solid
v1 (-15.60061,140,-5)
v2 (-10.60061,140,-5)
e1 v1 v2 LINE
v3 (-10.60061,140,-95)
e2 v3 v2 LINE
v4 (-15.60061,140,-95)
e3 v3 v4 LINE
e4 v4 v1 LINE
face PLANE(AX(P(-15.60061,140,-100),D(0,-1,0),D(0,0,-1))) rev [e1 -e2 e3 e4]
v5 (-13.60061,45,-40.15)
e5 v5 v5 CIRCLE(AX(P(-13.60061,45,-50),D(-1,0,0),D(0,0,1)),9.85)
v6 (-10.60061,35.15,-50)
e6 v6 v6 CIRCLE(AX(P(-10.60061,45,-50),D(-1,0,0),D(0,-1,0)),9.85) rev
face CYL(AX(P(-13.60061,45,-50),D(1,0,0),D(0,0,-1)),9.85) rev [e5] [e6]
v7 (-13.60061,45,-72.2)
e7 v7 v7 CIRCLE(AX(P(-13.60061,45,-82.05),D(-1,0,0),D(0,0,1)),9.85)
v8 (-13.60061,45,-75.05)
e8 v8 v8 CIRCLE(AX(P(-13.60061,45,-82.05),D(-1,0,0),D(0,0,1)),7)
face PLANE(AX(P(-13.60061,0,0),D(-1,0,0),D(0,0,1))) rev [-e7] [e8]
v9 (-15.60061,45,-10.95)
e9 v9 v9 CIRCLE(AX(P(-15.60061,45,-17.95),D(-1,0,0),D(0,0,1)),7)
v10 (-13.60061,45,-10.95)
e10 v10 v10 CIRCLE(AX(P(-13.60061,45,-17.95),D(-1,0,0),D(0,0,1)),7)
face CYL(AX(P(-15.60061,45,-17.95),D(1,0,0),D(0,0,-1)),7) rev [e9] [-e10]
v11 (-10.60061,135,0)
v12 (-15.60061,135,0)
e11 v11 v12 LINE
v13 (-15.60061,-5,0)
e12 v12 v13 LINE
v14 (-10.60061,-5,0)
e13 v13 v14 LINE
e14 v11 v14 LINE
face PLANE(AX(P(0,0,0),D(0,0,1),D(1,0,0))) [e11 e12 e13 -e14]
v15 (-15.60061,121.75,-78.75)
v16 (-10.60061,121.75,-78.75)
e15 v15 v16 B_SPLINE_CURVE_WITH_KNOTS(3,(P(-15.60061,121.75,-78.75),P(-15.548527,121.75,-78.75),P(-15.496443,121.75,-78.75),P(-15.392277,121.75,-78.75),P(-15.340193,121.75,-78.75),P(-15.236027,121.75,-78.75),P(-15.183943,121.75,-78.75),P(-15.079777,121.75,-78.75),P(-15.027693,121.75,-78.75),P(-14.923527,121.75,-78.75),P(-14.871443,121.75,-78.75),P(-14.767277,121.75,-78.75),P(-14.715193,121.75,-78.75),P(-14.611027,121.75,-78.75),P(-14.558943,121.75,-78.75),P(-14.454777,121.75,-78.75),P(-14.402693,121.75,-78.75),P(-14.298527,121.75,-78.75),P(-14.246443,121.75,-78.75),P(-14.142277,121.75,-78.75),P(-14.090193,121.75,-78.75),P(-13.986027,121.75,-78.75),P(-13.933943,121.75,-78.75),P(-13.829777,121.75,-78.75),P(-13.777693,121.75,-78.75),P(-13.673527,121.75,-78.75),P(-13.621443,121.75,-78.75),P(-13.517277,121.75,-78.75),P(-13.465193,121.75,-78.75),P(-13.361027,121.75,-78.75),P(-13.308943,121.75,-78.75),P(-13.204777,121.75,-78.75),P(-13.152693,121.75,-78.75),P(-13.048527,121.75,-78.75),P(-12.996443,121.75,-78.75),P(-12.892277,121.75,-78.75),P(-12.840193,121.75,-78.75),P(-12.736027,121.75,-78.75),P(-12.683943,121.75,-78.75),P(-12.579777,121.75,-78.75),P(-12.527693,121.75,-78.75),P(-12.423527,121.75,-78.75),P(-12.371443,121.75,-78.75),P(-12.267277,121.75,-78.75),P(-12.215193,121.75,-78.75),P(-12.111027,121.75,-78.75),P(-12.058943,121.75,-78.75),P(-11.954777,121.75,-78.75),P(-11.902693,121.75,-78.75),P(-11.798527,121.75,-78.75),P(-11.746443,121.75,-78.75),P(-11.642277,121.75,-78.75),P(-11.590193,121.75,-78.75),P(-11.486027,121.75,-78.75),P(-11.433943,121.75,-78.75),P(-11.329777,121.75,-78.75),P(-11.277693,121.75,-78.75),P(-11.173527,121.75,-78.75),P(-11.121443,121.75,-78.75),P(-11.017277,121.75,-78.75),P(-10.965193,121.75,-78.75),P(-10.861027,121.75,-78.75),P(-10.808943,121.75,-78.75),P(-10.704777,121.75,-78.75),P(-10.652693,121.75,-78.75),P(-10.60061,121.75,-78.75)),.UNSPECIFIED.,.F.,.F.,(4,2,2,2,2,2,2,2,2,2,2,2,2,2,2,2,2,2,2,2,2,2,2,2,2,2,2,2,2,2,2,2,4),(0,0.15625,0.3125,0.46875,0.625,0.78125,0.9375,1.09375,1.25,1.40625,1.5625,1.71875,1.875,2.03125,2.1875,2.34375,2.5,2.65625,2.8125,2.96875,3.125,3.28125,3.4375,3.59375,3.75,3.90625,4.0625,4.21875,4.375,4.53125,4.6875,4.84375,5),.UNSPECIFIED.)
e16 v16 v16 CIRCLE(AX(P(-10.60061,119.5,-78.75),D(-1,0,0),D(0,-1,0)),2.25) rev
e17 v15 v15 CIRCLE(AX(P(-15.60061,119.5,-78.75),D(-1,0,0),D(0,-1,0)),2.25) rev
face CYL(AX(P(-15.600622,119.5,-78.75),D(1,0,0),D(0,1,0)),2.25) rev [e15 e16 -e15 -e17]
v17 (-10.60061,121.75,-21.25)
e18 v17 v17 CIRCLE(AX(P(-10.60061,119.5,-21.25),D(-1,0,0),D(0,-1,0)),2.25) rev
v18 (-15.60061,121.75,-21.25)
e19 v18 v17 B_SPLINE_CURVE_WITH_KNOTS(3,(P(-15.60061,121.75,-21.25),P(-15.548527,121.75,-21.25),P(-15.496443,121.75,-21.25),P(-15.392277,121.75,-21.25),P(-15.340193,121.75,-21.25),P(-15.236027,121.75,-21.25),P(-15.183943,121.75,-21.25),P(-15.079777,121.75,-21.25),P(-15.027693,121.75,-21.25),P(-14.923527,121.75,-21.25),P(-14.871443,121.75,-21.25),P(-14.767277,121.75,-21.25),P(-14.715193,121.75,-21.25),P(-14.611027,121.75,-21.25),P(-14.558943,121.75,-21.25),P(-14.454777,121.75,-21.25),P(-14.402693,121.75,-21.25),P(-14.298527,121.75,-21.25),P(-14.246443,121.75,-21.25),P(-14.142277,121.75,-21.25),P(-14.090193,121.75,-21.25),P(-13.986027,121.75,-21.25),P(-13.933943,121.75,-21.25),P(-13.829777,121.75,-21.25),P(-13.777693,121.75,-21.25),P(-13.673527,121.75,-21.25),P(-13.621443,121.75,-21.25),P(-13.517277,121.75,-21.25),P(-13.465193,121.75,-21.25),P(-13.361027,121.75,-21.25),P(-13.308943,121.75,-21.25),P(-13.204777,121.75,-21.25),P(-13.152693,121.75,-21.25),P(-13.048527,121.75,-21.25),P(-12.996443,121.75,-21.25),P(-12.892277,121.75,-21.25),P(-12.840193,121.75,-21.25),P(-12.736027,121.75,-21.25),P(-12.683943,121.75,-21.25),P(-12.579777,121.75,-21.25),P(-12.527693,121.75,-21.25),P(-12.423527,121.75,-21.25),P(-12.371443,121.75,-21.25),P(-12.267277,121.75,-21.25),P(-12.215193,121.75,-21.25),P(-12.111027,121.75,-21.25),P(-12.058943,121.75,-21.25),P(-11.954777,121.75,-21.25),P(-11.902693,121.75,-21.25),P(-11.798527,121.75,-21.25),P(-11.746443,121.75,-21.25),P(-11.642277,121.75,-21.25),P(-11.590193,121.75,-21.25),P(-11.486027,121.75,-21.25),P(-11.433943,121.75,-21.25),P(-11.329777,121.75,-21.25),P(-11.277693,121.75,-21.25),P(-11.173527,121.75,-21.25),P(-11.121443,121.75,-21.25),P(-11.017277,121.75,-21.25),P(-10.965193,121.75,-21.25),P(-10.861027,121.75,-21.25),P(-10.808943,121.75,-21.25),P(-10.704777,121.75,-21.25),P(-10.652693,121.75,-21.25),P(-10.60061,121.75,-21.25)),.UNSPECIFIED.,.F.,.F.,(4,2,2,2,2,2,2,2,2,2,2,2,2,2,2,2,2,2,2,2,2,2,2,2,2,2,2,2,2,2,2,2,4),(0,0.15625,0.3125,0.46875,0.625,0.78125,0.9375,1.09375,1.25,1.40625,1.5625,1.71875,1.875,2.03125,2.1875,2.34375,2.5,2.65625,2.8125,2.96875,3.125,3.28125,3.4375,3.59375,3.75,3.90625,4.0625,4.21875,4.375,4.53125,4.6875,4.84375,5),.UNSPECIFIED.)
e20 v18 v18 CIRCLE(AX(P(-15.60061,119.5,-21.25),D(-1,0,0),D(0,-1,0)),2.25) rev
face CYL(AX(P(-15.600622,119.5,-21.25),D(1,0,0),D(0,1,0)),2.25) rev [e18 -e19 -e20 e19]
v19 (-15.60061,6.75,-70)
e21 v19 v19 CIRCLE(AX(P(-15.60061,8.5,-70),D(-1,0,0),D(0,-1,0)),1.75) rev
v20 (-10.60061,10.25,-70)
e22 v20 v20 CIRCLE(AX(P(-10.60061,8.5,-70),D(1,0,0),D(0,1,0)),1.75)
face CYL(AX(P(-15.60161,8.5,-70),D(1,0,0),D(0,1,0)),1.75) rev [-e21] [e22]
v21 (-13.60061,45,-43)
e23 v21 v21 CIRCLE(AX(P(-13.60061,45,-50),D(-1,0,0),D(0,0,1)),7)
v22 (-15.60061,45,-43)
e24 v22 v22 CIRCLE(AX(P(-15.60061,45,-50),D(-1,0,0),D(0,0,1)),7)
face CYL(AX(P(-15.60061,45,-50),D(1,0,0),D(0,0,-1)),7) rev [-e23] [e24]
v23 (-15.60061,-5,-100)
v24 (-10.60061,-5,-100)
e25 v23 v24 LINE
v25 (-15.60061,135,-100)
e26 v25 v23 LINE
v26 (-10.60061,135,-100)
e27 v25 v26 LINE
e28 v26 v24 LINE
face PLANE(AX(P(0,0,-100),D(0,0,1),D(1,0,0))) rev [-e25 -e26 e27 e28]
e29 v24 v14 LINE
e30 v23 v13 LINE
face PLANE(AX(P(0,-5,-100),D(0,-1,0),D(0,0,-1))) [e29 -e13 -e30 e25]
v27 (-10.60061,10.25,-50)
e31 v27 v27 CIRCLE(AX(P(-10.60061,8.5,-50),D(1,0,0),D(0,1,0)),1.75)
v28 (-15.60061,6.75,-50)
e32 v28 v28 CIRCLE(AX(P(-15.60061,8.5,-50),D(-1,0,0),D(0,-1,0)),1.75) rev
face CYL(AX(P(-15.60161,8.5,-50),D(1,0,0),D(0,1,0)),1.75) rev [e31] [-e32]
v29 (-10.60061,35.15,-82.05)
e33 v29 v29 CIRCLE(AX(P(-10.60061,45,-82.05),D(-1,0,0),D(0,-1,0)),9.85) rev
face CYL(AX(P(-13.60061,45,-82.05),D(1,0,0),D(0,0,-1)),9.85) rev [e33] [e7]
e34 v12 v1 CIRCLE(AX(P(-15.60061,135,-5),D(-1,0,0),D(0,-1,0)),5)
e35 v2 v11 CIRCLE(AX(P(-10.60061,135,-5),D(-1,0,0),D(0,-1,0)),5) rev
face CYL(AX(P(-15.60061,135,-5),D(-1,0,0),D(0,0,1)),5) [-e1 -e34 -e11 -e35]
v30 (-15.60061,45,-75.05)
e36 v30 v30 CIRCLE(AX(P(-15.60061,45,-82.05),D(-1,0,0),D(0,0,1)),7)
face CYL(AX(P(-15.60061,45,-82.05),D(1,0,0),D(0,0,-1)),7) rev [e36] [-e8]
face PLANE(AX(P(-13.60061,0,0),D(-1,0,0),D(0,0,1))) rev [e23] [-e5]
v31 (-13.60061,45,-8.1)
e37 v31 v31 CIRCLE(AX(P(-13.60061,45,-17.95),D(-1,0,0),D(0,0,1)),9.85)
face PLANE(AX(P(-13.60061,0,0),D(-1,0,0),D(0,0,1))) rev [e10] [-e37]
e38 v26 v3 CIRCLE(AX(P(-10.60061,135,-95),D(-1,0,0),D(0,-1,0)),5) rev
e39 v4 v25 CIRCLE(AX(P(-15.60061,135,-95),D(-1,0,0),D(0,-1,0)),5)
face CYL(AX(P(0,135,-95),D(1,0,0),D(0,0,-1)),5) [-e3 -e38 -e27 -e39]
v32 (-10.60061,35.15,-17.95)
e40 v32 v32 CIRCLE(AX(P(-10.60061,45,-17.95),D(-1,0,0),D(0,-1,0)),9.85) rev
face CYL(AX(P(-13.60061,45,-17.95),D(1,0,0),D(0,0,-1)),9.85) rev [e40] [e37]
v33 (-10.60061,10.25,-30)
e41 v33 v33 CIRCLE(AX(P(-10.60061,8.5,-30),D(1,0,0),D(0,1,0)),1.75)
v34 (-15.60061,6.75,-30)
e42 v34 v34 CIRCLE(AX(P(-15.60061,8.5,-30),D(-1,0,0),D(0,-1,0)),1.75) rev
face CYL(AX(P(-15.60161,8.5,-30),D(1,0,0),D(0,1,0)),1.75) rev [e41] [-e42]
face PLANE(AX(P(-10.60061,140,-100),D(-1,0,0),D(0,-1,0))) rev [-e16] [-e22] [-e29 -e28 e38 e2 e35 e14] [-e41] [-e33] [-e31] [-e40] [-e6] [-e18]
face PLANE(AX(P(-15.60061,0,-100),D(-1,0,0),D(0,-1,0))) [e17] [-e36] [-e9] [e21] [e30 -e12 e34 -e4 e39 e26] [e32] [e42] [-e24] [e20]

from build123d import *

# Parameters (mm, degrees)
BOSS_EXTRUDE1_DEPTH            = 100
CUT_EXTRUDE3_DEPTH             = 202.556443707
CUT_EXTRUDE3_DEPTH_BACK        = 202.556443707
SKETCH4_4_R                    = 9.85
CUT_EXTRUDE4_DEPTH             = 3
CUT_EXTRUDE5_START             = 103
SKETCH4_6_R                    = 9.85
CUT_EXTRUDE5_DEPTH             = 103
CUT_EXTRUDE6_REACH             = 206.206
SKETCH5_R                      = 2.25
CUT_EXTRUDE6_DIRECTION_2_DEPTH = 205.205778567
CUT_EXTRUDE7_REACH             = 201.841
SKETCH6_R                      = 2.25
SKETCH7_W                      = 12
SKETCH7_H                      = 15
CUT_EXTRUDE8_DEPTH             = 197.242821038
FILLET3_R                      = 2.5
FILLET4_R                      = 2.5
FILLET6_R                      = 5
CUT_EXTRUDE11_REACH            = 198.243
SKETCH8_W                      = 41.5
SKETCH8_H                      = 5
CUT_EXTRUDE12_REACH            = 174.119
SKETCH9_R                      = 1.75


with BuildPart() as part:
    # Sketch1 → Boss-Extrude1 (new body)
    with BuildSketch(Plane.XY):
        Polygon((-10.600610125, 140), (-15.600610125, 140), (-15.600610125, -5), (94.399389875, -5), (94.399389875, 140), (89.399389875, 140), (89.399389875, 0), (-10.600610125, 0), align=None)
    extrude(amount=-BOSS_EXTRUDE1_DEPTH)

    # Sketch4 → Cut-Extrude3 (cut, two sides: drawn at the far end of the back side and taken through both)
    with BuildSketch(Plane.ZY.offset(-89.399389875).offset(-CUT_EXTRUDE3_DEPTH_BACK)):
        with BuildLine():
            ThreePointArc((-89.05, 45), (-82.05, 38), (-75.05, 45))
            Line((-75.05, 45), (-82.05, 45))
            Line((-82.05, 45), (-89.05, 45))
        make_face()
        with BuildLine():
            Line((-82.05, 45), (-75.05, 45))
            ThreePointArc((-75.05, 45), (-82.05, 52), (-89.05, 45))
            Line((-89.05, 45), (-82.05, 45))
        make_face()
        with BuildLine():
            ThreePointArc((-57, 45), (-50, 38), (-43, 45))
            Line((-43, 45), (-50, 45))
            Line((-50, 45), (-57, 45))
        make_face()
        with BuildLine():
            Line((-50, 45), (-43, 45))
            ThreePointArc((-43, 45), (-50, 52), (-57, 45))
            Line((-57, 45), (-50, 45))
        make_face()
        with BuildLine():
            ThreePointArc((-24.95, 45), (-17.95, 38), (-10.95, 45))
            Line((-10.95, 45), (-17.95, 45))
            Line((-17.95, 45), (-24.95, 45))
        make_face()
        with BuildLine():
            Line((-17.95, 45), (-10.95, 45))
            ThreePointArc((-10.95, 45), (-17.95, 52), (-24.95, 45))
            Line((-24.95, 45), (-17.95, 45))
        make_face()
    extrude(amount=CUT_EXTRUDE3_DEPTH + CUT_EXTRUDE3_DEPTH_BACK, mode=Mode.SUBTRACT)

    # Sketch4<4> → Cut-Extrude4 (cut)
    with BuildSketch(Plane.ZY.offset(-89.399389875)):
        with Locations((-50, 45)):
            Circle(SKETCH4_4_R)
        with Locations((-82.05, 45)):
            Circle(SKETCH4_4_R)
        with Locations((-17.95, 45)):
            Circle(SKETCH4_4_R)
    extrude(amount=-CUT_EXTRUDE4_DEPTH, mode=Mode.SUBTRACT)

    # Sketch4<6> → Cut-Extrude5 (cut)
    with BuildSketch(Plane.ZY.offset(-89.399389875).offset(CUT_EXTRUDE5_START)):
        with Locations((-50, 45)):
            Circle(SKETCH4_6_R)
        with Locations((-82.05, 45)):
            Circle(SKETCH4_6_R)
        with Locations((-17.95, 45)):
            Circle(SKETCH4_6_R)
    extrude(amount=-CUT_EXTRUDE5_DEPTH, mode=Mode.SUBTRACT)

    # Sketch5 → Cut-Extrude6 (cut, up to next)
    with BuildSketch(Plane.ZY.offset(15.600610125), mode=Mode.PRIVATE) as cut_extrude6_sk1:
        with Locations(Location((-78.75, 119.5, 0), (0, 0, 90))):
            Circle(SKETCH5_R)
    cut_extrude6_tool1 = extrude(cut_extrude6_sk1.sketch, amount=-CUT_EXTRUDE6_REACH, mode=Mode.PRIVATE) & part.part
    # Sketch5 → Cut-Extrude6 (cut, up to next)
    with BuildSketch(Plane.ZY.offset(15.600610125), mode=Mode.PRIVATE) as cut_extrude6_sk2:
        with Locations(Location((-21.25, 119.5, 0), (0, 0, 90))):
            Circle(SKETCH5_R)
    cut_extrude6_tool2 = extrude(cut_extrude6_sk2.sketch, amount=-CUT_EXTRUDE6_REACH, mode=Mode.PRIVATE) & part.part
    add(cut_extrude6_tool1.solids().sort_by_distance((-15.60061, 119.5, -78.75))[0], mode=Mode.SUBTRACT)
    add(cut_extrude6_tool2.solids().sort_by_distance((-15.60061, 119.5, -21.25))[0], mode=Mode.SUBTRACT)

    # Sketch5 → Cut-Extrude6 direction 2 (cut)
    with BuildSketch(Plane.ZY.offset(15.600610125)):
        with Locations(Location((-78.75, 119.5, 0), (0, 0, 90))):
            Circle(SKETCH5_R)
        with Locations(Location((-21.25, 119.5, 0), (0, 0, 90))):
            Circle(SKETCH5_R)
    extrude(amount=CUT_EXTRUDE6_DIRECTION_2_DEPTH, mode=Mode.SUBTRACT)

    # Sketch6 → Cut-Extrude7 (cut, up to next)
    with BuildSketch(Plane.XZ.offset(5), mode=Mode.PRIVATE) as cut_extrude7_sk1:
        with Locations(Location((71.899389875, -50, 0), (0, 0, 270))):
            Circle(SKETCH6_R)
    cut_extrude7_tool1 = extrude(cut_extrude7_sk1.sketch, amount=-CUT_EXTRUDE7_REACH, mode=Mode.PRIVATE) & part.part
    # Sketch6 → Cut-Extrude7 (cut, up to next)
    with BuildSketch(Plane.XZ.offset(5), mode=Mode.PRIVATE) as cut_extrude7_sk2:
        with Locations(Location((6.899389875, -50, 0), (0, 0, 270))):
            Circle(SKETCH6_R)
    cut_extrude7_tool2 = extrude(cut_extrude7_sk2.sketch, amount=-CUT_EXTRUDE7_REACH, mode=Mode.PRIVATE) & part.part
    add(cut_extrude7_tool1.solids().sort_by_distance((71.89939, -5, -50))[0], mode=Mode.SUBTRACT)
    add(cut_extrude7_tool2.solids().sort_by_distance((6.89939, -5, -50))[0], mode=Mode.SUBTRACT)

    # Sketch7 → Cut-Extrude8 (cut, through all)
    with BuildSketch(Plane(origin=(0, 0, 0), x_dir=(1, 0, 0), z_dir=(0, 1, 0))):
        Polygon((45.399389875, 100), (39.399389875, 100), (33.399389875, 100), (33.399389875, 85), (45.399389875, 85), align=None)
        with Locations((39.399389875, 7.5)):
            Rectangle(SKETCH7_W, SKETCH7_H)
    extrude(amount=-CUT_EXTRUDE8_DEPTH, mode=Mode.SUBTRACT)

    # Fillet3
    fillet3_edges = [part.edges().sort_by_distance(p)[0] for p in [
        (33.399389875, 0, -7.5),
        (33.399389875, -2.5, 0),
        (39.399389875, 0, -15),
        (33.399389875, -2.5, -15),
        (45.399389875, -5, -7.5),
        (45.399389875, -2.5, -15),
        (45.399389875, -2.5, 0),
        (33.399389875, -5, -7.5),
        (39.399389875, -5, -15),
        (45.399389875, 0, -7.5),
    ]]
    fillet(fillet3_edges, radius=FILLET3_R - 0.0001)  # a hair under: the kernel refuses the full size

    # Fillet4
    fillet4_edges = [part.edges().sort_by_distance(p)[0] for p in [
        (45.399389875, 0, -92.5),
        (45.399389875, -2.5, -100),
        (39.399389875, -5, -85),
        (45.399389875, -2.5, -85),
        (33.399389875, -5, -92.5),
        (33.399389875, -2.5, -85),
        (33.399389875, -2.5, -100),
        (45.399389875, -5, -92.5),
        (33.399389875, 0, -92.5),
        (39.399389875, 0, -85),
    ]]
    fillet(fillet4_edges, radius=FILLET4_R - 0.0001)  # a hair under: the kernel refuses the full size

    # Fillet6
    fillet6_edges = [part.edges().sort_by_distance(p)[0] for p in [
        (91.899389875, 140, -100),
        (-13.100610125, 140, -100),
        (-13.100610125, 140, 0),
        (91.899389875, 140, 0),
    ]]
    fillet(fillet6_edges, radius=FILLET6_R)

    # Sketch8 → Cut-Extrude11 (cut, up to next)
    with BuildSketch(Plane.XY, mode=Mode.PRIVATE) as cut_extrude11_sk1:
        with Locations((10.149389875, -2.5)):
            Rectangle(SKETCH8_W, SKETCH8_H)
    cut_extrude11_tool1 = extrude(cut_extrude11_sk1.sketch, amount=-CUT_EXTRUDE11_REACH, mode=Mode.PRIVATE) & part.part
    # Sketch8 → Cut-Extrude11 (cut, up to next)
    with BuildSketch(Plane.XY, mode=Mode.PRIVATE) as cut_extrude11_sk2:
        Polygon((-10.600610125, 135), (-10.600610125, 0), (30.899389875, 0), (30.899389875, -5), (94.399389875, -5), (94.399389875, 140), (-10.600610125, 140), align=None)
    cut_extrude11_tool2 = extrude(cut_extrude11_sk2.sketch, amount=-CUT_EXTRUDE11_REACH, mode=Mode.PRIVATE) & part.part
    add(cut_extrude11_tool1.solids().sort_by_distance((10.14939, -2.5, 0))[0], mode=Mode.SUBTRACT)
    add(cut_extrude11_tool2.solids().sort_by_distance((42.338086, 68.467205, 0))[0], mode=Mode.SUBTRACT)

    # Sketch9 → Cut-Extrude12 (cut, up to next)
    with BuildSketch(Plane(origin=(-10.600610125, 0, 0), x_dir=(0, 0, -1), z_dir=(1, 0, 0)), mode=Mode.PRIVATE) as cut_extrude12_sk1:
        with Locations(Location((70, 8.5, 0), (0, 0, 90))):
            Circle(SKETCH9_R)
    cut_extrude12_tool1 = extrude(cut_extrude12_sk1.sketch, amount=-CUT_EXTRUDE12_REACH, mode=Mode.PRIVATE) & part.part
    # Sketch9 → Cut-Extrude12 (cut, up to next)
    with BuildSketch(Plane(origin=(-10.600610125, 0, 0), x_dir=(0, 0, -1), z_dir=(1, 0, 0)), mode=Mode.PRIVATE) as cut_extrude12_sk2:
        with Locations(Location((50, 8.5, 0), (0, 0, 90))):
            Circle(SKETCH9_R)
    cut_extrude12_tool2 = extrude(cut_extrude12_sk2.sketch, amount=-CUT_EXTRUDE12_REACH, mode=Mode.PRIVATE) & part.part
    # Sketch9 → Cut-Extrude12 (cut, up to next)
    with BuildSketch(Plane(origin=(-10.600610125, 0, 0), x_dir=(0, 0, -1), z_dir=(1, 0, 0)), mode=Mode.PRIVATE) as cut_extrude12_sk3:
        with Locations(Location((30, 8.5, 0), (0, 0, 90))):
            Circle(SKETCH9_R)
    cut_extrude12_tool3 = extrude(cut_extrude12_sk3.sketch, amount=-CUT_EXTRUDE12_REACH, mode=Mode.PRIVATE) & part.part
    add(cut_extrude12_tool1.solids().sort_by_distance((-10.60061, 8.5, -70))[0], mode=Mode.SUBTRACT)
    add(cut_extrude12_tool2.solids().sort_by_distance((-10.60061, 8.5, -50))[0], mode=Mode.SUBTRACT)
    add(cut_extrude12_tool3.solids().sort_by_distance((-10.60061, 8.5, -30))[0], mode=Mode.SUBTRACT)


solid = part.part
